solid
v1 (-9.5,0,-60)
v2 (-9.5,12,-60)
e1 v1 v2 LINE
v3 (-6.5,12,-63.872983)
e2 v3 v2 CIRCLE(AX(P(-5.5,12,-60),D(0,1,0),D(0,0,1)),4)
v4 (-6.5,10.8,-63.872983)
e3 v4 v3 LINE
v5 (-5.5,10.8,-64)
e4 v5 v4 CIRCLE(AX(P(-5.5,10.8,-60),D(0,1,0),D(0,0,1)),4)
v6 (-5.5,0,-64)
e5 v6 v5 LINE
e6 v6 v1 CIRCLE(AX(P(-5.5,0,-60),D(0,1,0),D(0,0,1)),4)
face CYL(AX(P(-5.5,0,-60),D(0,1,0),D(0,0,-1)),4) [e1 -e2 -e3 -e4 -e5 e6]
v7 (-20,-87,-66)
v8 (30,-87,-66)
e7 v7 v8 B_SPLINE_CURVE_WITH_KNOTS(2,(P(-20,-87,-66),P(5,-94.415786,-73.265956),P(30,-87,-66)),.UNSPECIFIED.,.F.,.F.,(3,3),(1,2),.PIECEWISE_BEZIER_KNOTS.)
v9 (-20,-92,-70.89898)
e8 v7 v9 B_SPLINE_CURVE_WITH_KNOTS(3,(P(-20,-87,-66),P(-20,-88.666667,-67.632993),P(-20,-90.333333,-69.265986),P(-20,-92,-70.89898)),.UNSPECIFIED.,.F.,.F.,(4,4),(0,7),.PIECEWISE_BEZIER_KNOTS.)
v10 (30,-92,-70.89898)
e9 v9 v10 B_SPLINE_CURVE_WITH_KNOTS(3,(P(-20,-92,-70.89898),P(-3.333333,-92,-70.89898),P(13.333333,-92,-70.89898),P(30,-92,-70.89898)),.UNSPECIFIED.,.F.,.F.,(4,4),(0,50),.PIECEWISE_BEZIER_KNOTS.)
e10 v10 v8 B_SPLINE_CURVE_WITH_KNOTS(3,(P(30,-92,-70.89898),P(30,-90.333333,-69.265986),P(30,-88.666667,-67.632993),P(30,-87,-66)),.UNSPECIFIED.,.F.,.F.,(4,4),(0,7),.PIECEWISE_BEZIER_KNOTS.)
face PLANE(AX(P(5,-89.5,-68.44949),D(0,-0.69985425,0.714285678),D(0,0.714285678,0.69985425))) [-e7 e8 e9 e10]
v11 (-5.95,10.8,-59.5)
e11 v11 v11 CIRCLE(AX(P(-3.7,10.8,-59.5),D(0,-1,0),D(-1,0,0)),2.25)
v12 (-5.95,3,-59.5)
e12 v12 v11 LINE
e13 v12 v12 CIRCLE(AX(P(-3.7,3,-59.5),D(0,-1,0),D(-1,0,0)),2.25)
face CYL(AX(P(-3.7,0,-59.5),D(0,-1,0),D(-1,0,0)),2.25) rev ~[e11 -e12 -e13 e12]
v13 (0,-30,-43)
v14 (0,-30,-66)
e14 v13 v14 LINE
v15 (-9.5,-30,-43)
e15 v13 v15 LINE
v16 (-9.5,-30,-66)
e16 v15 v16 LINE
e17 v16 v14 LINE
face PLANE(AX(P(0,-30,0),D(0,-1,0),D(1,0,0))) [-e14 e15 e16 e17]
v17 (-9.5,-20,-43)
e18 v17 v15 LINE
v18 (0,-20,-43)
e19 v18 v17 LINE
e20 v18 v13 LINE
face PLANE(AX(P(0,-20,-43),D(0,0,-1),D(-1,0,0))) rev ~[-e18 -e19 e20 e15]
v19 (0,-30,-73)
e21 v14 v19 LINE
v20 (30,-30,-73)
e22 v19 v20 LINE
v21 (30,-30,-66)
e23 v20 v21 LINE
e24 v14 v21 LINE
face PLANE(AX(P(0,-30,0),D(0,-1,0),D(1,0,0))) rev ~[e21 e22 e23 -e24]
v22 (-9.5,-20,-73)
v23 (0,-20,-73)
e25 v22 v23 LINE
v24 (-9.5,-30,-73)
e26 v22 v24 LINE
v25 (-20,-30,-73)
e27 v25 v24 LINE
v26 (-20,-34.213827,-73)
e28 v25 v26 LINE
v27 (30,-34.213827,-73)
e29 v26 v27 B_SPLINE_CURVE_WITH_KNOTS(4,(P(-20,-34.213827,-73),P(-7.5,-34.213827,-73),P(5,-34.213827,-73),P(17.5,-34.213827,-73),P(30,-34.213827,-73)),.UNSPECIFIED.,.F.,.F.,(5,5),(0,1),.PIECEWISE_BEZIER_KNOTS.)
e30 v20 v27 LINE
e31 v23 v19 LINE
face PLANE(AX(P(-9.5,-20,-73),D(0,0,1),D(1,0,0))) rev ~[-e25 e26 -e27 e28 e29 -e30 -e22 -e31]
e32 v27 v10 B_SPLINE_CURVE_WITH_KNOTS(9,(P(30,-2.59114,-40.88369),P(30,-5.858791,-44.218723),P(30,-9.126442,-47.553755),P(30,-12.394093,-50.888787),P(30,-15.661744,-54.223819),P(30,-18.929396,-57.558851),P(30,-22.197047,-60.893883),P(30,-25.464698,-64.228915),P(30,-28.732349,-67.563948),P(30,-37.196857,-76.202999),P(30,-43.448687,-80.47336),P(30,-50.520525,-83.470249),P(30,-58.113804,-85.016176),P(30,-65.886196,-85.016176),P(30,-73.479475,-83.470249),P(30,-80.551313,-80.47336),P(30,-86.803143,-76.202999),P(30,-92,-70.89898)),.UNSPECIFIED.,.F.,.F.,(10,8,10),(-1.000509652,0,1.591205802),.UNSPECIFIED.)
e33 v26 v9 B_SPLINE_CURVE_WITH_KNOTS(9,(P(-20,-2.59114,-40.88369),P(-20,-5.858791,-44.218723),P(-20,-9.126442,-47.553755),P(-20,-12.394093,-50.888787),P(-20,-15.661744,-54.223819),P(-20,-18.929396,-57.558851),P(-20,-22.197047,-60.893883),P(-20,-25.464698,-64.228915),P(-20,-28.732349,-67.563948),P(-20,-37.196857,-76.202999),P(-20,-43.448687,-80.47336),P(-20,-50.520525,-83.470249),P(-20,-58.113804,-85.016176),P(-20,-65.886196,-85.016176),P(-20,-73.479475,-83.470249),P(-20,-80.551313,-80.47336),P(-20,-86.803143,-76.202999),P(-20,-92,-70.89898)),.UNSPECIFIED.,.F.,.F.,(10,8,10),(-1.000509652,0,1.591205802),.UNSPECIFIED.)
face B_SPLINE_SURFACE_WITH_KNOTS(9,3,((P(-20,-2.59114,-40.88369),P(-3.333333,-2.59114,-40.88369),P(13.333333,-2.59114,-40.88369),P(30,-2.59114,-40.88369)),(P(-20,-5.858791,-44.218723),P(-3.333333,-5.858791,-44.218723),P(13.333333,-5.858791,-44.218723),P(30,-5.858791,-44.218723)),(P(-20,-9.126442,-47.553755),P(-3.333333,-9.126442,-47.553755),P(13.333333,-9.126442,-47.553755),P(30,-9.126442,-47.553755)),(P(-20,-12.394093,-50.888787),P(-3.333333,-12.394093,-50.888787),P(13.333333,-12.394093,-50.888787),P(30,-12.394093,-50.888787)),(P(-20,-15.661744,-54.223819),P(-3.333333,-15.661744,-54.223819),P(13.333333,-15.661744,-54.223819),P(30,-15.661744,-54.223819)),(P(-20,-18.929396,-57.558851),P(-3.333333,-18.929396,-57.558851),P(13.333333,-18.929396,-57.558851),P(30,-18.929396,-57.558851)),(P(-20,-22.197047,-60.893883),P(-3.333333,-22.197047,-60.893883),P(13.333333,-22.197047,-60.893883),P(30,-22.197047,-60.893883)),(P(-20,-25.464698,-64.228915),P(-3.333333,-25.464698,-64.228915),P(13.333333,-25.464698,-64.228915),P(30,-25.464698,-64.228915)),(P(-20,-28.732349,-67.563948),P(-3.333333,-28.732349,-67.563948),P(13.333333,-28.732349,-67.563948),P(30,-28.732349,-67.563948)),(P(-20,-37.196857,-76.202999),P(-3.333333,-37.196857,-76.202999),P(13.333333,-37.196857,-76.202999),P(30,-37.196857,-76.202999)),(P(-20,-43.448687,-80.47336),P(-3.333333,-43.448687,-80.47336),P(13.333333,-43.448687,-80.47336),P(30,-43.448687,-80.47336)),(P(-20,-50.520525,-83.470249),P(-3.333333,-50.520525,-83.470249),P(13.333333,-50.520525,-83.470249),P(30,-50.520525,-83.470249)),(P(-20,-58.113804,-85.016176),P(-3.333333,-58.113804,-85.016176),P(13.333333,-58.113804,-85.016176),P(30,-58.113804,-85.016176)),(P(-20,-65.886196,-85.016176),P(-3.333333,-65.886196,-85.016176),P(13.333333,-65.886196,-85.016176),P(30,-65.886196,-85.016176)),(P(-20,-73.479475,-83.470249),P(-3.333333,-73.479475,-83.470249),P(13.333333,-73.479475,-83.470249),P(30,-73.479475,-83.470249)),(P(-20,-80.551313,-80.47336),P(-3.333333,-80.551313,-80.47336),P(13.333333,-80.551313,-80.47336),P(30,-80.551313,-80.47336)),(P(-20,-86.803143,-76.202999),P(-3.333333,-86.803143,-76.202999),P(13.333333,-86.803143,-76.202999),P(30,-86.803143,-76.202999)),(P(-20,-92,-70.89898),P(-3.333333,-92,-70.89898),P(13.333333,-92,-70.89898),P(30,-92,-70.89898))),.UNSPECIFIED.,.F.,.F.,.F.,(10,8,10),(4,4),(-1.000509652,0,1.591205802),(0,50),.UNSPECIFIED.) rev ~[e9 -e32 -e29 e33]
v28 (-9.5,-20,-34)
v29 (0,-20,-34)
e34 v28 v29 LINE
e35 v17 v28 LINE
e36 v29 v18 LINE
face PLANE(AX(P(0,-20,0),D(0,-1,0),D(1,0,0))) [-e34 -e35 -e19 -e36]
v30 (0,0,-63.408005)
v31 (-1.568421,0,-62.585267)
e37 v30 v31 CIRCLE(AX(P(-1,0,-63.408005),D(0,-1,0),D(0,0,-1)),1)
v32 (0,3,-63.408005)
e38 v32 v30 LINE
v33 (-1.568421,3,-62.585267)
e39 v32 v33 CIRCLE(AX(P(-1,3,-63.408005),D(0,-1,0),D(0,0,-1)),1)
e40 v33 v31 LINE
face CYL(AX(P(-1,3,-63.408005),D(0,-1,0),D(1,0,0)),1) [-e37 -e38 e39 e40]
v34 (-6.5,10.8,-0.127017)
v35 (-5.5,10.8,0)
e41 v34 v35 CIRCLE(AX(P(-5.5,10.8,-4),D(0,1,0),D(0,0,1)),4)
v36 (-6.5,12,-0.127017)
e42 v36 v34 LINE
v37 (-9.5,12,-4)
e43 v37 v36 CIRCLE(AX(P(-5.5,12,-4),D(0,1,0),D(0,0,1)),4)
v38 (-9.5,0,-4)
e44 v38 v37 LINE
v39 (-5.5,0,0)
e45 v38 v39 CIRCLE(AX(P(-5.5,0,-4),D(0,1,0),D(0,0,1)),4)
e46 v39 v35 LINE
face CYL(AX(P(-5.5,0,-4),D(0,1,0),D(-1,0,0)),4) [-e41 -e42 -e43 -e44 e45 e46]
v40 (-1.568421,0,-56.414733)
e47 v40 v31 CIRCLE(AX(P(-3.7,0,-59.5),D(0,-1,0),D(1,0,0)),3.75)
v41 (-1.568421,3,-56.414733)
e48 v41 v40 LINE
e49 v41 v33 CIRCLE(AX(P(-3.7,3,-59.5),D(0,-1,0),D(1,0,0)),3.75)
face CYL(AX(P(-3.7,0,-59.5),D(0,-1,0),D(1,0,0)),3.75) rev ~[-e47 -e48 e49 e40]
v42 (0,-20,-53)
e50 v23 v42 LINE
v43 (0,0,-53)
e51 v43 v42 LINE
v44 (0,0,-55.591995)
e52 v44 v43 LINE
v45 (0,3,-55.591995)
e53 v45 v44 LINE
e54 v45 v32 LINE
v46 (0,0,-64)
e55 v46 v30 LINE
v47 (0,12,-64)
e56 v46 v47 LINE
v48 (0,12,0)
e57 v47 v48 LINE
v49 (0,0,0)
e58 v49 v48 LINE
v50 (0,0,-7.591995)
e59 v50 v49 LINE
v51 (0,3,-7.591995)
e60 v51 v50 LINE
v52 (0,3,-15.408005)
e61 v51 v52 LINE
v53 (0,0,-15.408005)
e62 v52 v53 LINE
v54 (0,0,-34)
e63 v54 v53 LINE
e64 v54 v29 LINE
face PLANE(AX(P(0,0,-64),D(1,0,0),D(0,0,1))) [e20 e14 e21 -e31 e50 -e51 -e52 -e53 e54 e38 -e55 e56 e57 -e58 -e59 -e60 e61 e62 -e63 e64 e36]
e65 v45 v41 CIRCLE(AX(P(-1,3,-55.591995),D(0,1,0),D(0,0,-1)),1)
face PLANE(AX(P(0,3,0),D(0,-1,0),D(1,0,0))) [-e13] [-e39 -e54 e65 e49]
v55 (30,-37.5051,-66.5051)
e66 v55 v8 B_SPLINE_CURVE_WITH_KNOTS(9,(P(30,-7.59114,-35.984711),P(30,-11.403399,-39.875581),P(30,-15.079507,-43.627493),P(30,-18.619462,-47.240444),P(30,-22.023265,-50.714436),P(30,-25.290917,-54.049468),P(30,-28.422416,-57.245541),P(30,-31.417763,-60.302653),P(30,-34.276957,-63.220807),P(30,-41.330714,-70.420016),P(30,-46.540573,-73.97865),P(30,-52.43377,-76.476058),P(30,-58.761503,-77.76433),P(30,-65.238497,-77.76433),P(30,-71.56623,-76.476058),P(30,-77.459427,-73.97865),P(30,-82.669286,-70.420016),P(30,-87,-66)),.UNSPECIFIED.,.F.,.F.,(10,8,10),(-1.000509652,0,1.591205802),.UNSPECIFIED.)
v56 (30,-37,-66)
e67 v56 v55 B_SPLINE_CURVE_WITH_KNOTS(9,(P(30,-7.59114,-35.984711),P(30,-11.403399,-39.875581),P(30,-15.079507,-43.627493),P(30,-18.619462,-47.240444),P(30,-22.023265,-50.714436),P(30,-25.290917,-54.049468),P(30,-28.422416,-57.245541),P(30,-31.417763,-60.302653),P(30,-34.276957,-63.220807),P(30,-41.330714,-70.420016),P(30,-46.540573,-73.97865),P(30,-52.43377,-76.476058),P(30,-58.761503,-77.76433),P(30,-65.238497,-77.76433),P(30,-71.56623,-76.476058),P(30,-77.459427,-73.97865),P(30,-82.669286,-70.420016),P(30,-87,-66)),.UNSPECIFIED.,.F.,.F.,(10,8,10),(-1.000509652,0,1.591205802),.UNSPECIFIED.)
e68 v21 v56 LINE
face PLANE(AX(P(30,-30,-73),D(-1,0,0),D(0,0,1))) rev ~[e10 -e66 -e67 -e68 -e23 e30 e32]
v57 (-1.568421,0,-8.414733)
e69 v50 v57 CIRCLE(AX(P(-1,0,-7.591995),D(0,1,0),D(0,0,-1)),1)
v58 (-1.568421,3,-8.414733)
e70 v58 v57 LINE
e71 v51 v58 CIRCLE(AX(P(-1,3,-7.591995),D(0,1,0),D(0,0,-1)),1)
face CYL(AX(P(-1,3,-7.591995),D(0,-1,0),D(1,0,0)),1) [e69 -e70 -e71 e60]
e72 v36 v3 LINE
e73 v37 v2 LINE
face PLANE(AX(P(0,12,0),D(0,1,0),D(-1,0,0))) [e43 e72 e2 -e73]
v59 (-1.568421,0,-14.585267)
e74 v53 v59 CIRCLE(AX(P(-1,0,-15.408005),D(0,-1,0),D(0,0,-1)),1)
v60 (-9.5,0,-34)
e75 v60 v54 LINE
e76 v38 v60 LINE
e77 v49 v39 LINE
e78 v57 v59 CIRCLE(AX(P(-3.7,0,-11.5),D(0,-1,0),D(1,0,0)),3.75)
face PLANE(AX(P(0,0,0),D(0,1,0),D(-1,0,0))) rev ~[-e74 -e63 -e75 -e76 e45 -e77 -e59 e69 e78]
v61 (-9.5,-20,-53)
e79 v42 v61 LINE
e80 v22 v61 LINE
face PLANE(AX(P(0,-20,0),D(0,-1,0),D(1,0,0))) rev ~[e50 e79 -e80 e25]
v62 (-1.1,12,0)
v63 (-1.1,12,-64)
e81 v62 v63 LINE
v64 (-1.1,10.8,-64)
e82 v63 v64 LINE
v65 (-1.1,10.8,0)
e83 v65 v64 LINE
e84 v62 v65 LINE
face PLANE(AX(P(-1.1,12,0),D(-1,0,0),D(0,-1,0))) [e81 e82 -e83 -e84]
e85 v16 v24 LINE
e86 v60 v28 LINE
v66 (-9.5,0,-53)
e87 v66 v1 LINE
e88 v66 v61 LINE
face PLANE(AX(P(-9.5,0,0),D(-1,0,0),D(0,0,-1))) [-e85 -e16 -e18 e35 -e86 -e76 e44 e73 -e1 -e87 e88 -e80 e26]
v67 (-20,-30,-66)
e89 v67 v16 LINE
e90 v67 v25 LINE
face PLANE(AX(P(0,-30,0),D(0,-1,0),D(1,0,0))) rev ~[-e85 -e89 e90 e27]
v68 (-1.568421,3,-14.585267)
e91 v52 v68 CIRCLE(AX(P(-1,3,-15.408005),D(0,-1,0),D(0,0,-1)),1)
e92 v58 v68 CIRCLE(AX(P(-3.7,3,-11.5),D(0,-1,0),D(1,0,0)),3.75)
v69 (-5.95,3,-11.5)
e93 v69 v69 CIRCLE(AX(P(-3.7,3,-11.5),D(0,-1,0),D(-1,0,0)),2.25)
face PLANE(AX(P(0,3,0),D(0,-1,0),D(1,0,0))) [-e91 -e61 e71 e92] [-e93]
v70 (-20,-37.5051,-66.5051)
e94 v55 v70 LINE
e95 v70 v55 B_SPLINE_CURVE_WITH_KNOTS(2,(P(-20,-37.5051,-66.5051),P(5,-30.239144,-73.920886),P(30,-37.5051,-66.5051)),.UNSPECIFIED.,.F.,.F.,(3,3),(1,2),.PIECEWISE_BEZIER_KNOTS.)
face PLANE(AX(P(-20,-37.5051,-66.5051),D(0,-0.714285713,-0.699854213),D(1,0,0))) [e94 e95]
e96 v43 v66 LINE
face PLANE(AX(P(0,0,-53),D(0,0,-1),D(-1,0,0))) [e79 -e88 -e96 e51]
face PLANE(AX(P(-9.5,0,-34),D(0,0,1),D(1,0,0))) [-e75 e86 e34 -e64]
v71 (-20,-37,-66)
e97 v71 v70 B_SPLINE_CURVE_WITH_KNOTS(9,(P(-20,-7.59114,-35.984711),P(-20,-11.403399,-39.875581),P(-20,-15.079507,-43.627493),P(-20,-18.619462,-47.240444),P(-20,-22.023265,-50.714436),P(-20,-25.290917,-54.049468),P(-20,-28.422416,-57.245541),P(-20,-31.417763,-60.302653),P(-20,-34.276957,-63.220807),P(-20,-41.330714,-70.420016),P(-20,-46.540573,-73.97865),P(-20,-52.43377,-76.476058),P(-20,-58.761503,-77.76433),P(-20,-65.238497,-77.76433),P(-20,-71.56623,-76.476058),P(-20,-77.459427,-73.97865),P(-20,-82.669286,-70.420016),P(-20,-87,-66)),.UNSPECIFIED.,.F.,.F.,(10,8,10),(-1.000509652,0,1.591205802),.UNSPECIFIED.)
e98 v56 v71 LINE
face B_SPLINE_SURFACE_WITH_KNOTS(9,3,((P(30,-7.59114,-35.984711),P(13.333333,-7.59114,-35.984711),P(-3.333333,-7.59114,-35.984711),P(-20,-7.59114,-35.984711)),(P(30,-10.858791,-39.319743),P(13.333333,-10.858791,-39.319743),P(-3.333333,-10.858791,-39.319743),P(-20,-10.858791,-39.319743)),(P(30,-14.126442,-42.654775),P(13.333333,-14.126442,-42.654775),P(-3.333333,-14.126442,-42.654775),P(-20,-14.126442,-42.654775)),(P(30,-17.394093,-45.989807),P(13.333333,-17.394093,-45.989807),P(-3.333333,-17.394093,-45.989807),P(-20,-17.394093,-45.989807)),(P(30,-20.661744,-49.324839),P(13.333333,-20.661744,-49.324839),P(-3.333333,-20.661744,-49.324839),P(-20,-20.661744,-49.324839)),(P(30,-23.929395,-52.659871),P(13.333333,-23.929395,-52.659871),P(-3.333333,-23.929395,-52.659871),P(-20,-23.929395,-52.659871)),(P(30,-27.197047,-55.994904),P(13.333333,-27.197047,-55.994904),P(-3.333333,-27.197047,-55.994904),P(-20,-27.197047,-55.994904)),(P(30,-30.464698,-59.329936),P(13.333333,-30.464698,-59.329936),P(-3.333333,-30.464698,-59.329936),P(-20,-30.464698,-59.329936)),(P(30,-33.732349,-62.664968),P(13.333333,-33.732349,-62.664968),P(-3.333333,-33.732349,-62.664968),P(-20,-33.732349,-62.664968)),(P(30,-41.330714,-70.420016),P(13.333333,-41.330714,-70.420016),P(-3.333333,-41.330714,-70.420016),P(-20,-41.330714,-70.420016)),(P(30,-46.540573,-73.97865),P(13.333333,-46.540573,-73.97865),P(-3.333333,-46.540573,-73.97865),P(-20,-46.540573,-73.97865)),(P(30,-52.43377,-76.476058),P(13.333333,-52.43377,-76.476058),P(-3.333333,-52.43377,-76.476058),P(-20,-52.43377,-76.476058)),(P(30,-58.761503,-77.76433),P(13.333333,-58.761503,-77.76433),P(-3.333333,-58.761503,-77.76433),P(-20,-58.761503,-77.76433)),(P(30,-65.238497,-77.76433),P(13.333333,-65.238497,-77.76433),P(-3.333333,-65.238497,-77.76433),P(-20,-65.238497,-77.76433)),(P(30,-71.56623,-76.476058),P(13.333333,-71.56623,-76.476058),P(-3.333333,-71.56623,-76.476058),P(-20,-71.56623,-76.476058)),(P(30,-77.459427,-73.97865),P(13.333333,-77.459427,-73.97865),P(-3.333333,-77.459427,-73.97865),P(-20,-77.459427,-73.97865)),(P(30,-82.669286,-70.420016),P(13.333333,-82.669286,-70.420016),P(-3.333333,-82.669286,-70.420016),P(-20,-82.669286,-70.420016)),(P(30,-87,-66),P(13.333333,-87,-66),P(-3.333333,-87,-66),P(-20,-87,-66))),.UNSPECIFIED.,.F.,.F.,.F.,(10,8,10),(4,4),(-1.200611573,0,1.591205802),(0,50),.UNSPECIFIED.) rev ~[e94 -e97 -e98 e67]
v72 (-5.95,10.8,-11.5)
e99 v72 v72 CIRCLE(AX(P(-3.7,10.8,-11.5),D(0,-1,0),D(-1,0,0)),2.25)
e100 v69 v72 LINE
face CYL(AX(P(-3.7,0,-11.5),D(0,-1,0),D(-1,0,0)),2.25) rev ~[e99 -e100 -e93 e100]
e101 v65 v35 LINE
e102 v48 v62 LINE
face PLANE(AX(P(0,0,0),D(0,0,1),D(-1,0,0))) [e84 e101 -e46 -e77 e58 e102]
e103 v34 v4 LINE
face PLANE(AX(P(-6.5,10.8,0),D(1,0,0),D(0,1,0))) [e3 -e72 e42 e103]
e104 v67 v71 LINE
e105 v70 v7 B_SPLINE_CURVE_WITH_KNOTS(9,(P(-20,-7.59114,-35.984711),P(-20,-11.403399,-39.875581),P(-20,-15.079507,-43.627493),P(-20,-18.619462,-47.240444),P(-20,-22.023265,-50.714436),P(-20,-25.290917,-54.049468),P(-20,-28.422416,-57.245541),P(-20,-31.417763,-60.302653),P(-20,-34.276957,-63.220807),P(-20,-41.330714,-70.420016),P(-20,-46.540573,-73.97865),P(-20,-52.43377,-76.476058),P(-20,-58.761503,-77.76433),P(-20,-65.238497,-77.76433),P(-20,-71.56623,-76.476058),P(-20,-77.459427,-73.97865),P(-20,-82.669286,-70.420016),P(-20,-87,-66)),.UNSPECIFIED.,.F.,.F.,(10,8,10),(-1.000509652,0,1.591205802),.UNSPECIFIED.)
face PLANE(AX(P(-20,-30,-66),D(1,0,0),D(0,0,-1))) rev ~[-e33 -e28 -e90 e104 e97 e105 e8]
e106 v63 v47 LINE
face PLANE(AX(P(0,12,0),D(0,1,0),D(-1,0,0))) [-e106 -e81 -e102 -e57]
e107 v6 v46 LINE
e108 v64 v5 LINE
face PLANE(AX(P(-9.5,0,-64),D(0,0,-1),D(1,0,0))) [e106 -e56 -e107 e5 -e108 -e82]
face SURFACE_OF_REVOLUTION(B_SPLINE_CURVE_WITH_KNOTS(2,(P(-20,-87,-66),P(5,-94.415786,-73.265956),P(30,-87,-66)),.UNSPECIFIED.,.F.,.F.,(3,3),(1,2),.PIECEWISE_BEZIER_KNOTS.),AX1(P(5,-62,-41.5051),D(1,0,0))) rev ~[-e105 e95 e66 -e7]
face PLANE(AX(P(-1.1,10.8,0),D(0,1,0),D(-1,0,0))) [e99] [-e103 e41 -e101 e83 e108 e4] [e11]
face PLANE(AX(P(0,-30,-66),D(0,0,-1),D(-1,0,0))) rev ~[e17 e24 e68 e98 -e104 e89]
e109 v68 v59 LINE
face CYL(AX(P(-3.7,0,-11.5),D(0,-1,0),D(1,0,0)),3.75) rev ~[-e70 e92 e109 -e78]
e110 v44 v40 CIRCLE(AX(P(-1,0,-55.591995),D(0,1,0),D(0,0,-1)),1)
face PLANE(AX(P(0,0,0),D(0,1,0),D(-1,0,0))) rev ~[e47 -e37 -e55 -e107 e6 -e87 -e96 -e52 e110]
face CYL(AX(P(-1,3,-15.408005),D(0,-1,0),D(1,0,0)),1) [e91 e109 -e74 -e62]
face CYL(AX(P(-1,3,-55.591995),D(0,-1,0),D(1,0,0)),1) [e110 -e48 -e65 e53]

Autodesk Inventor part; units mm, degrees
ref_plane "YZ Plane" through (0, 0, 0) normal (1, 0, 0) x (0, 1, 0)
ref_plane "XZ Plane" through (0, 0, 0) normal (0, 1, 0) x (-1, 0, 0)
ref_plane "XY Plane" through (0, 0, 0) normal (0, 0, 1) x (1, 0, 0)
sketch "Sketch1" plane through (0, 0, 0) normal (0, 1, 0) x (-1, 0, 0)
  line L0 (0, 0) -> (9.5, 0)
  line L1 (9.5, 0) -> (9.5, -64)
  line L2 (9.5, -64) -> (0, -64)
  line L3 (0, -64) -> (0, 0)
  circle A0 centre (3.7, -11.5) radius 2.25
  circle A1 centre (3.7, -59.5) radius 2.25
  line L4 (3.7, -11.5) -> (3.7, -59.5) construction
  dimension "d1" = 9.5
  dimension "d2" = 64
  dimension "d3" = 4.5
  dimension "d4" = 48
  dimension "d6" = 3.7
  dimension "d17" = 4.5
extrude "Extrusion1" add sketch "Sketch1" along normal blind 12
sketch "Sketch2" plane through (-9.5, 0, 0) normal (0, 0, 1) x (1, 0, 0)
  line L0 (9.5, 12) -> (0, 12) projected
  line L1 (3, 12) -> (8.4, 12)
  line L2 (8.4, 12) -> (8.4, 10.8)
  line L3 (8.4, 10.8) -> (3, 10.8)
  line L4 (3, 10.8) -> (3, 12)
  line L5 (9.5, 0) -> (9.5, 12) projected
  line L6 (3.55, 0) -> (8.05, 0) projected
  line L7 (3.55, 12) -> (8.05, 12) projected
  line L8 (9.5, 0) -> (9.5, 12) projected
  line L9 (9.5, 0) -> (9.5, 12) projected
  line L10 (3.55, 12) -> (8.05, 12) projected
  line L11 (3.55, 12) -> (3.55, 0) projected
  line L12 (3.55, 12) -> (8.05, 12) projected
  line L13 (3.55, 0) -> (8.05, 0) projected
  line L14 (3.55, 12) -> (8.05, 12) projected
  line L15 (3.55, 0) -> (8.05, 0) projected
  line L16 (3.55, 12) -> (8.05, 12) projected
  line L17 (3.55, 0) -> (8.05, 0) projected
  dimension "d9" = 1.1
  dimension "d10" = 5.4
  dimension "d11" = 1.2
  dimension "d76" = 12
extrude "Extrusion2" cut sketch "Sketch2" against normal up to next
sketch "Sketch3" plane through (0, 0, 0) normal (0, -1, 0) x (1, 0, 0)
  circle A0 centre (-3.7, -11.5) radius 2.25 projected
  circle A1 centre (-3.7, -11.5) radius 3.75
  circle A2 centre (-3.7, -59.5) radius 2.25 projected
  circle A3 centre (-3.7, -59.5) radius 3.75
  point P0 (0, 0)
  dimension "d14" = 7.5
extrude "Extrusion3" cut sketch "Sketch3" against normal blind 3
fillet "Fillet1" radius 1 4 edges at (0, 1.5, -58.8897) (0, 1.5, -60.1103) (0, 1.5, -10.8897) (0, 1.5, -12.1103)
fillet "Fillet2" radius 4 2 edges at (-9.5, 6, -64) (-9.5, 6, 0)
sketch "Sketch28" plane through (0, 0, 0) normal (0, -1, 0) x (1, 0, 0)
  arc A0 (-1.5684, -56.4147) -> (0, -55.592) centre (-1, -55.592) ccw projected
  line L0 (0, -55.592) -> (0, -53)
  line L1 (0, -15.408) -> (0, -55.592) projected
  line L2 (-9.5, -60) -> (-9.5, -4) projected
  line L3 (0, -53) -> (-9.5, -53)
  line L4 (-9.5, -53) -> (-9.5, -34)
  line L5 (-9.5, -34) -> (0, -34)
  line L6 (0, -34) -> (0, -53)
  point P0 (0, 0)
  point P1 (0, -34)
  dimension "d107" = 2.592
  dimension "d108" = 19
extrude "Extrusion19" add sketch "Sketch28" along normal blind 20
sketch "Sketch40" plane through (0, -20, 0) normal (0, -1, 0) x (1, 0, 0)
  line L0 (0, -53) -> (-9.5, -53) projected
  line L1 (-9.5, -53) -> (-9.5, -73)
  line L2 (-9.5, -73) -> (0, -73)
  line L3 (0, -73) -> (0, -43)
  line L4 (0, 0) -> (0, -64) projected
  line L5 (0, -43) -> (-9.5, -43)
  line L6 (-9.5, -43) -> (-9.5, -53)
  line L7 (-9.5, -43) -> (0, -43)
  line L8 (0, -43) -> (0, -73)
  line L9 (0, -73) -> (-9.5, -73)
  line L10 (-9.5, -73) -> (-9.5, -43)
  dimension "d130" = 20
  dimension "d131" = 30
extrude "Extrusion21" add sketch "Sketch40" along normal blind 10
sketch "Sketch41" plane through (0, 0, -53) normal (0, 0, -1) x (-1, 0, 0)
  point P0 (0, 0)
sketch "Sketch42" plane through (0, -30, 0) normal (0, -1, 0) x (1, 0, 0)
  line L0 (0, -73) -> (0, -53) projected
  line L1 (0, -73) -> (30, -73)
  line L2 (30, -73) -> (30, -66)
  line L3 (30, -66) -> (-20, -66)
  line L4 (-20, -66) -> (-20, -73)
  line L5 (-20, -73) -> (0, -73)
  point P0 (0, 0)
  dimension "d134" = 30
  dimension "d135" = 7
  dimension "d137" = 50
extrude "Extrusion22" add sketch "Sketch42" along normal blind 7
sketch "Sketch44" plane through (0, -37, 0) normal (0, -1, 0) x (1, 0, 0)
  line L0 (-20, -73) -> (30, -73) projected
  line L1 (30, -66) -> (-20, -66) projected
  line L2 (-20, -73) -> (30, -73)
  line L3 (30, -73) -> (30, -66)
  line L4 (30, -66) -> (-20, -66)
  line L5 (-20, -66) -> (-20, -73)
  point P0 (0, 0)
sketch "Sketch45" plane through (-20, -30, -73) normal (-1, 0, 0) x (0, 0, 1)
  line L0 (7, 0) -> (7, -7) projected
  arc A0 (7, -7) -> (7, -57) centre (31.4949, -32) ccw
  point P0 (73, 30)
  dimension "d142" = 50
  dimension "d143" = 35
sweep "Sweep3" add profiles "Sketch44" path "Sketch45"
sketch "Sketch46" plane through (-20, -87, -66) normal (0, -0.6998542, 0.7142857) x (1, 0, 0)
  line L0 (0, 35.7143) -> (0, 0) projected
  line L1 (0, 0) -> (25, -10.3821) construction
  line L2 (50, 0) -> (0, 0) projected
  line L3 (25, -10.3821) -> (50, 0) construction
  spline S0 degree 2 poles (0, 0) (25, -10.3821) (50, 0) knots 1 1 1 2 2 2
  line L4 (0, 0) -> (50, 0)
  line L5 (60.7, 35) -> (-10.7, 35) projected
  point P0 (20, 108.3332)
revolve "Revolution1" cut sketch "Sketch46" angle 90 about axis through (5, -62, -41.5051) along (1, 0, 0)
sketch "Sketch47" plane through (-20, -92, -70.899) normal (0, -0.6998542, 0.7142857) x (1, 0, 0)
  point P0 (20, 115.3332)
properties part number "Back"
